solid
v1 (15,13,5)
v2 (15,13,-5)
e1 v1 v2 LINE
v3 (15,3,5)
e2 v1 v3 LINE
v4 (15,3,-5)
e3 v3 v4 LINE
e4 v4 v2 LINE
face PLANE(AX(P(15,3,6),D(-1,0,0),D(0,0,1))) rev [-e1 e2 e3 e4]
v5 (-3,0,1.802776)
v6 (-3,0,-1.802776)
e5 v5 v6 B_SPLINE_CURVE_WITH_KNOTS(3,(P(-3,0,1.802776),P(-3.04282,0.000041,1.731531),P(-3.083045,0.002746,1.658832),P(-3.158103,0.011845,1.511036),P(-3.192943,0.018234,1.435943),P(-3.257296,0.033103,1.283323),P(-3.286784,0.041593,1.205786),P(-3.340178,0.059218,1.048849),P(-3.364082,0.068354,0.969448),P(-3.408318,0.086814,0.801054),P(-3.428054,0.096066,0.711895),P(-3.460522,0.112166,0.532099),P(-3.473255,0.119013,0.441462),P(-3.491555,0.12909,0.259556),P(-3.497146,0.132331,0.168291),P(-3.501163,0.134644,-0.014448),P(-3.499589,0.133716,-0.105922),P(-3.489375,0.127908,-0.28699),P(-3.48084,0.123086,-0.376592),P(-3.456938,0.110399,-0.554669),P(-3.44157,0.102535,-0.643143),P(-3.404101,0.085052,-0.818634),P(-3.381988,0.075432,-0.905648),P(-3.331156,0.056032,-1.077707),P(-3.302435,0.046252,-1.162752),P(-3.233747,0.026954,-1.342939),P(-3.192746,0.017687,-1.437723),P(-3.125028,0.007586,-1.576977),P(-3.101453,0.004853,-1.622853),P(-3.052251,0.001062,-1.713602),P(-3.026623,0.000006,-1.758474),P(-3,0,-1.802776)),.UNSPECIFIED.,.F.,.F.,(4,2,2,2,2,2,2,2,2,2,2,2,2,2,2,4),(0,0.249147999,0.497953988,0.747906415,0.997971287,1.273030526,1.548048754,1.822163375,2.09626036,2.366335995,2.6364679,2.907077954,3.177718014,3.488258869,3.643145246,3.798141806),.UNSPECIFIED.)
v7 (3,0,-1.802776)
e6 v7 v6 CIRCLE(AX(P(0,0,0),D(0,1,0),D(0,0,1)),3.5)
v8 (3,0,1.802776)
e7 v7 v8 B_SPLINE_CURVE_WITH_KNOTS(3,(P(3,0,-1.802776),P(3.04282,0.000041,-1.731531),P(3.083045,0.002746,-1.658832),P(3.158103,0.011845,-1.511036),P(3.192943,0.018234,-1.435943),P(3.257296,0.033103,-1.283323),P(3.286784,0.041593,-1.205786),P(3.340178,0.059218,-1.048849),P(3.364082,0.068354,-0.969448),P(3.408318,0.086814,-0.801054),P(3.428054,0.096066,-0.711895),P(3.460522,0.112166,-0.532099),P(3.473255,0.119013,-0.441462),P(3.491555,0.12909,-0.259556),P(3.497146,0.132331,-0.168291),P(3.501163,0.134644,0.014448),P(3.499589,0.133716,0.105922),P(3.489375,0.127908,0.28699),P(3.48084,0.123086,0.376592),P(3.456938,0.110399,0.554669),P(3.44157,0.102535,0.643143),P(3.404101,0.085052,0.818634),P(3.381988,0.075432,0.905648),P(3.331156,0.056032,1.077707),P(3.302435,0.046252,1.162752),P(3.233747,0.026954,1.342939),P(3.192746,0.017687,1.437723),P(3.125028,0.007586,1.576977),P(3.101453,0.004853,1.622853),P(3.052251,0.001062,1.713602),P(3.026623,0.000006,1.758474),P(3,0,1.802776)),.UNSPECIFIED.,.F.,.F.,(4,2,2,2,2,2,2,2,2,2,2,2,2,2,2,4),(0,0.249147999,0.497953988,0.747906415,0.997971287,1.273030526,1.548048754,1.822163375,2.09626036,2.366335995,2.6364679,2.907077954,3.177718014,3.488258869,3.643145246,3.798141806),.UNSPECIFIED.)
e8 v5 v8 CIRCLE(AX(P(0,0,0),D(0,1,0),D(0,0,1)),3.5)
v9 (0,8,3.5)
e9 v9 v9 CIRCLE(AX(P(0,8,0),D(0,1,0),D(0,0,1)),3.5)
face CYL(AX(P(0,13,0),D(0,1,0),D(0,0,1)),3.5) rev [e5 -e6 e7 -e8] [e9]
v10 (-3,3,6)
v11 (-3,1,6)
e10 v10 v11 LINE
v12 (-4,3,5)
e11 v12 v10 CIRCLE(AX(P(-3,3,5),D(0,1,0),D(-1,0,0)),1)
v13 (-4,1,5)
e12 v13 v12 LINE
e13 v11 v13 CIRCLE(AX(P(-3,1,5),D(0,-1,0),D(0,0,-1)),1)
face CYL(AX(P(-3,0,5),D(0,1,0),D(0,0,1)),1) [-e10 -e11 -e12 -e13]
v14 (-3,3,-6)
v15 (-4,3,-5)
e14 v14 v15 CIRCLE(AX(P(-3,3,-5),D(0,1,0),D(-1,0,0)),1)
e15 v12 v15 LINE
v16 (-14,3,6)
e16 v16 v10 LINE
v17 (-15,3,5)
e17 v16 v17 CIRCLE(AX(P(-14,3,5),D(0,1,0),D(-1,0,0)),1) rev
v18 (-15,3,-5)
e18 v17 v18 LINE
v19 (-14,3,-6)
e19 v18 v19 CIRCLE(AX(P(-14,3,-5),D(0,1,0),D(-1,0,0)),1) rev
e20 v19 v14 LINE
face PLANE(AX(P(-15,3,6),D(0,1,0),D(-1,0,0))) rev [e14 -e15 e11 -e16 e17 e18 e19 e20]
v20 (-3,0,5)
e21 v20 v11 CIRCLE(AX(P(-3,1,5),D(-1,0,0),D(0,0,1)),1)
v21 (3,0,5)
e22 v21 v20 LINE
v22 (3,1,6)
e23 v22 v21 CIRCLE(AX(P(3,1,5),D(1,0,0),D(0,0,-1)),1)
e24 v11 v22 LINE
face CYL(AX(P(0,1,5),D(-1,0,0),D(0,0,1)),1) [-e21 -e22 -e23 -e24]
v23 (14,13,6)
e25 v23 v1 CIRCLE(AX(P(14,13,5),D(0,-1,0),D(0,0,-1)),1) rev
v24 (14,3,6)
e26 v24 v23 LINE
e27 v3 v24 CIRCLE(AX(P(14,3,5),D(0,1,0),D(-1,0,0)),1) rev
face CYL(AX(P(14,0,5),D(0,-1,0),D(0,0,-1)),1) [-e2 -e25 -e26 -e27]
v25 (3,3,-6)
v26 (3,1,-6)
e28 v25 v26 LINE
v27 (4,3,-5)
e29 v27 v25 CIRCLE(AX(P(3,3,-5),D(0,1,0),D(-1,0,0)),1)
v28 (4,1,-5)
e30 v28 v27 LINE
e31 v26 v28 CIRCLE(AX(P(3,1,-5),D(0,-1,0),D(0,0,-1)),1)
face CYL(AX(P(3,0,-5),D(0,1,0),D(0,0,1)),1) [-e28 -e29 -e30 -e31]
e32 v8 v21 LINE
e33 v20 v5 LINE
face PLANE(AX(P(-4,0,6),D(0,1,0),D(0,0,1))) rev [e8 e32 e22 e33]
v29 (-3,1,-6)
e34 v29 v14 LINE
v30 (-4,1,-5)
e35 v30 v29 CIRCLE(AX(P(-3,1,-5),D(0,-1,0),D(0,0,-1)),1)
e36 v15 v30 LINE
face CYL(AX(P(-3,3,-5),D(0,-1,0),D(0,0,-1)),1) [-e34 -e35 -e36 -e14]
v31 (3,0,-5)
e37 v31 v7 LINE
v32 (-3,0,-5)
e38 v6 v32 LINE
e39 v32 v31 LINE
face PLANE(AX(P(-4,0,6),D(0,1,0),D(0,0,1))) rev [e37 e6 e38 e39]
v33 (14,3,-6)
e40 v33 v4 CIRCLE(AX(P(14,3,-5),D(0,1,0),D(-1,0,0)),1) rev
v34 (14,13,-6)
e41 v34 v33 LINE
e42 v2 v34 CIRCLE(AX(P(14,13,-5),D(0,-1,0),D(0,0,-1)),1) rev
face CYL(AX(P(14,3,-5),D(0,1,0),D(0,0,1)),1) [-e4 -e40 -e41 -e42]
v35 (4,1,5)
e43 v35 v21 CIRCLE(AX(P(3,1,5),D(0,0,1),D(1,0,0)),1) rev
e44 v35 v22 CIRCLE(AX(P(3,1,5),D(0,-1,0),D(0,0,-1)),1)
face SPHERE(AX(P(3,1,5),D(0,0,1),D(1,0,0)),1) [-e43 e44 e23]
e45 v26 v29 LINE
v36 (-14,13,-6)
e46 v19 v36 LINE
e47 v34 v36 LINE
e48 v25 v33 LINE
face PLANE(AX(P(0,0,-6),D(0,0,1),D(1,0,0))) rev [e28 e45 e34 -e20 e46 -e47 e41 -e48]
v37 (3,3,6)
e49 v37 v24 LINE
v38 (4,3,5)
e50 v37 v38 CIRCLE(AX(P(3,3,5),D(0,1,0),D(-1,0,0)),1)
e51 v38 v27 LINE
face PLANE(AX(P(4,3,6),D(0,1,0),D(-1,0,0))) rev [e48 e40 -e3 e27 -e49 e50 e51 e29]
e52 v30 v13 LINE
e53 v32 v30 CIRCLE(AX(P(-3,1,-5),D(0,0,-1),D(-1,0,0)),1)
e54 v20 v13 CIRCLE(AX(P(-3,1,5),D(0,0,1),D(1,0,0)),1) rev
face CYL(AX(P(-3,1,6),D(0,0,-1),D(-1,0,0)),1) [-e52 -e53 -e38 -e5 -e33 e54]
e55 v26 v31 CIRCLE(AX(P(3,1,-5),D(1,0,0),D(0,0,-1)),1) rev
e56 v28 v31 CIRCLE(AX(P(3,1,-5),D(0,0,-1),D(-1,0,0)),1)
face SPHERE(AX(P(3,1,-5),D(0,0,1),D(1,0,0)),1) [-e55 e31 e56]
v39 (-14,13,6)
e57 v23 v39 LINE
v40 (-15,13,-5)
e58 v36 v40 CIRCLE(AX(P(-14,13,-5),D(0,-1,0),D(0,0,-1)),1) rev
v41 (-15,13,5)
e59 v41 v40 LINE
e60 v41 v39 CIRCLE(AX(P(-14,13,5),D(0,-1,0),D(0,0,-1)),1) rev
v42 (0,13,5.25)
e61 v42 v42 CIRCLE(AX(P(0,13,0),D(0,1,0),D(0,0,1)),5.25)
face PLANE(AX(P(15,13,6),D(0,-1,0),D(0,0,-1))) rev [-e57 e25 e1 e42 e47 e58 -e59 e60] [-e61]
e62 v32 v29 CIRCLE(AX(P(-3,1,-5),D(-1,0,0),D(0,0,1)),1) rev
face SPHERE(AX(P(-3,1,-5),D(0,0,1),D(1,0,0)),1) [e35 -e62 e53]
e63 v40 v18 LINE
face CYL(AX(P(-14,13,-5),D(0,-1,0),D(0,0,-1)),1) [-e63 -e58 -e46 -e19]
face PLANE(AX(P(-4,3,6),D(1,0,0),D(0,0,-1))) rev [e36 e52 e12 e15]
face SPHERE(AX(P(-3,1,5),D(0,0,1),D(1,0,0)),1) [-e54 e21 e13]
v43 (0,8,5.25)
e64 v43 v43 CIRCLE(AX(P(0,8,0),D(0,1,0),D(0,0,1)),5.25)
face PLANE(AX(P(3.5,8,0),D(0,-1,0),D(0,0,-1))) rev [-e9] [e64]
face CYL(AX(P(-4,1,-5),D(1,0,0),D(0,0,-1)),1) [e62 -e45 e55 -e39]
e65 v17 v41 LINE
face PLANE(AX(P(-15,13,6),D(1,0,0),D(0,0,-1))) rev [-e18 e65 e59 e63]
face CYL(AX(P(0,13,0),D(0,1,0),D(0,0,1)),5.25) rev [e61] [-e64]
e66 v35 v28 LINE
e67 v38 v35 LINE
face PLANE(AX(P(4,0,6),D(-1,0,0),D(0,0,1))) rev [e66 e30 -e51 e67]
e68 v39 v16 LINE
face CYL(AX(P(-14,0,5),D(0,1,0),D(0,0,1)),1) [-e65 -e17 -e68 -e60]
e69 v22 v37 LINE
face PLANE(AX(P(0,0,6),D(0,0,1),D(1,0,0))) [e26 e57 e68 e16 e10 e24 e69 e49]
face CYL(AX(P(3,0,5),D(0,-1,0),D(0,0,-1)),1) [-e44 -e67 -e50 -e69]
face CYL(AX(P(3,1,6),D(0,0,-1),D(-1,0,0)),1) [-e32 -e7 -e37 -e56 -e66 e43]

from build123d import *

# Parameters (mm, degrees)
BOSS_EXTRUDE1_DEPTH            = 6
CBORE_FOR_M6_SHCS1_D           = 7
CBORE_FOR_M6_SHCS1_CBORE_D     = 10.5
CBORE_FOR_M6_SHCS1_CBORE_DEPTH = 5
FILLET1_R                      = 1


with BuildPart() as part:
    # Sketch1 → Boss-Extrude1 (new, symmetric)
    with BuildSketch(Plane.XY):
        Polygon((-15, 13), (-15, 3), (-4, 3), (-4, 0), (4, 0), (4, 3), (15, 3), (15, 13), align=None)
    extrude(amount=BOSS_EXTRUDE1_DEPTH, both=True)

    # CBORE for M6 SHCS1 (through all)
    with Locations(Plane(origin=(0, 13, 0), x_dir=(1, 0, 0), z_dir=(0, 1, 0))):
        with Locations((0, 0)):
            CounterBoreHole(CBORE_FOR_M6_SHCS1_D / 2, CBORE_FOR_M6_SHCS1_CBORE_D / 2, CBORE_FOR_M6_SHCS1_CBORE_DEPTH)

    # Fillet1
    # the kernel refuses this fillet: 1 mm, written as the material it takes off along each edge
    with BuildSketch(Plane(origin=(-3, 1, 5), x_dir=(-1, 0, 0), z_dir=(0, 0, 1))) as fillet1_piece_1_section:
        Polygon((0, 0), (FILLET1_R, 0), (FILLET1_R, FILLET1_R), (0, FILLET1_R), align=None)
    fillet1_piece_1 = extrude(amount=FILLET1_R, mode=Mode.PRIVATE)
    fillet1_piece_1 = fillet1_piece_1 - Plane(origin=(-3, 1, 5), x_dir=(0.7071067811865475, 0.7071067811865475, 0), z_dir=(0, 0, 1)) * Sphere(FILLET1_R, mode=Mode.PRIVATE)
    add(fillet1_piece_1, mode=Mode.SUBTRACT)
    with BuildSketch(Plane(origin=(3, 1, -5), x_dir=(0, -1, 0), z_dir=(0, 0, -1))) as fillet1_piece_2_section:
        Polygon((0, 0), (FILLET1_R, 0), (FILLET1_R, -FILLET1_R), (0, -FILLET1_R), align=None)
    fillet1_piece_2 = extrude(amount=FILLET1_R, mode=Mode.PRIVATE)
    fillet1_piece_2 = fillet1_piece_2 - Plane(origin=(3, 1, -5), x_dir=(-0.7071067811865475, 0.7071067811865475, 0), z_dir=(0, 0, -1)) * Sphere(FILLET1_R, mode=Mode.PRIVATE)
    add(fillet1_piece_2, mode=Mode.SUBTRACT)
    with BuildSketch(Plane(origin=(3, 1, 5), x_dir=(0, -1, 0), z_dir=(0, 0, 1))) as fillet1_piece_3_section:
        Polygon((0, 0), (FILLET1_R, 0), (FILLET1_R, FILLET1_R), (0, FILLET1_R), align=None)
    fillet1_piece_3 = extrude(amount=FILLET1_R, mode=Mode.PRIVATE)
    fillet1_piece_3 = fillet1_piece_3 - Plane(origin=(3, 1, 5), x_dir=(-0.7071067811865475, 0.7071067811865475, 0), z_dir=(0, 0, 1)) * Sphere(FILLET1_R, mode=Mode.PRIVATE)
    add(fillet1_piece_3, mode=Mode.SUBTRACT)
    with BuildSketch(Plane(origin=(-3, 1, -5), x_dir=(-1, 0, 0), z_dir=(0, 0, -1))) as fillet1_piece_4_section:
        Polygon((0, 0), (FILLET1_R, 0), (FILLET1_R, -FILLET1_R), (0, -FILLET1_R), align=None)
    fillet1_piece_4 = extrude(amount=FILLET1_R, mode=Mode.PRIVATE)
    fillet1_piece_4 = fillet1_piece_4 - Plane(origin=(-3, 1, -5), x_dir=(0.7071067811865475, 0.7071067811865475, 0), z_dir=(0, 0, -1)) * Sphere(FILLET1_R, mode=Mode.PRIVATE)
    add(fillet1_piece_4, mode=Mode.SUBTRACT)
    with BuildSketch(Plane(origin=(-15, 15.5, -6), x_dir=(0, 0, 1), z_dir=(0, -1, 0)), Plane(origin=(15, 0.5, 6), x_dir=(-1, 0, 0), z_dir=(0, 1, 0))) as fillet1_piece_5:
        with BuildLine():
            CenterArc((FILLET1_R, -FILLET1_R), FILLET1_R, 90, 90)
            Line((0, -FILLET1_R), (0, 0))
            Line((0, 0), (FILLET1_R, 0))
        make_face()
    extrude(amount=15, mode=Mode.SUBTRACT)
    with BuildSketch(Plane(origin=(-4, 3, 6), x_dir=(1, 0, 0), z_dir=(0, -1, 0)), Plane(origin=(4, 1, 6), x_dir=(-1, 0, 0), z_dir=(0, 1, 0))) as fillet1_piece_6:
        with BuildLine():
            CenterArc((FILLET1_R, -FILLET1_R), FILLET1_R, 90, 90)
            Line((0, -FILLET1_R), (0, 0))
            Line((0, 0), (FILLET1_R, 0))
        make_face()
    extrude(amount=2, mode=Mode.SUBTRACT)
    with BuildSketch(Plane(origin=(4, 0, -5), x_dir=(-1, 0, 0), z_dir=(0, 0, 1)), Plane(origin=(-4, 0, -5), x_dir=(0, 1, 0), z_dir=(0, 0, 1))) as fillet1_piece_7:
        with BuildLine():
            CenterArc((FILLET1_R, -FILLET1_R), FILLET1_R, 90, 90)
            Line((0, -FILLET1_R), (0, 0))
            Line((0, 0), (FILLET1_R, 0))
        make_face()
    extrude(amount=10, mode=Mode.SUBTRACT)
    with BuildSketch(Plane(origin=(-3, 0, 6), x_dir=(0, 1, 0), z_dir=(1, 0, 0))) as fillet1_piece_8:
        with BuildLine():
            CenterArc((FILLET1_R, -FILLET1_R), FILLET1_R, 90, 90)
            Line((0, -FILLET1_R), (0, 0))
            Line((0, 0), (FILLET1_R, 0))
        make_face()
    extrude(amount=6, mode=Mode.SUBTRACT)
    with BuildSketch(Plane(origin=(-15, 15.5, 6), x_dir=(0, 0, -1), z_dir=(0, -1, 0)), Plane(origin=(15, 0.5, -6), x_dir=(-1, 0, 0), z_dir=(0, 1, 0))) as fillet1_piece_9:
        with BuildLine():
            CenterArc((FILLET1_R, FILLET1_R), FILLET1_R, 180, 90)
            Line((0, FILLET1_R), (0, 0))
            Line((0, 0), (FILLET1_R, 0))
        make_face()
    extrude(amount=15, mode=Mode.SUBTRACT)
    with BuildSketch(Plane(origin=(4, 1, -6), x_dir=(-1, 0, 0), z_dir=(0, 1, 0)), Plane(origin=(-4, 3, -6), x_dir=(1, 0, 0), z_dir=(0, -1, 0))) as fillet1_piece_10:
        with BuildLine():
            CenterArc((FILLET1_R, FILLET1_R), FILLET1_R, 180, 90)
            Line((0, FILLET1_R), (0, 0))
            Line((0, 0), (FILLET1_R, 0))
        make_face()
    extrude(amount=2, mode=Mode.SUBTRACT)
    with BuildSketch(Plane(origin=(-3, 0, -6), x_dir=(0, 1, 0), z_dir=(1, 0, 0))) as fillet1_piece_11:
        with BuildLine():
            CenterArc((FILLET1_R, FILLET1_R), FILLET1_R, 180, 90)
            Line((0, FILLET1_R), (0, 0))
            Line((0, 0), (FILLET1_R, 0))
        make_face()
    extrude(amount=6, mode=Mode.SUBTRACT)


solid = part.part
